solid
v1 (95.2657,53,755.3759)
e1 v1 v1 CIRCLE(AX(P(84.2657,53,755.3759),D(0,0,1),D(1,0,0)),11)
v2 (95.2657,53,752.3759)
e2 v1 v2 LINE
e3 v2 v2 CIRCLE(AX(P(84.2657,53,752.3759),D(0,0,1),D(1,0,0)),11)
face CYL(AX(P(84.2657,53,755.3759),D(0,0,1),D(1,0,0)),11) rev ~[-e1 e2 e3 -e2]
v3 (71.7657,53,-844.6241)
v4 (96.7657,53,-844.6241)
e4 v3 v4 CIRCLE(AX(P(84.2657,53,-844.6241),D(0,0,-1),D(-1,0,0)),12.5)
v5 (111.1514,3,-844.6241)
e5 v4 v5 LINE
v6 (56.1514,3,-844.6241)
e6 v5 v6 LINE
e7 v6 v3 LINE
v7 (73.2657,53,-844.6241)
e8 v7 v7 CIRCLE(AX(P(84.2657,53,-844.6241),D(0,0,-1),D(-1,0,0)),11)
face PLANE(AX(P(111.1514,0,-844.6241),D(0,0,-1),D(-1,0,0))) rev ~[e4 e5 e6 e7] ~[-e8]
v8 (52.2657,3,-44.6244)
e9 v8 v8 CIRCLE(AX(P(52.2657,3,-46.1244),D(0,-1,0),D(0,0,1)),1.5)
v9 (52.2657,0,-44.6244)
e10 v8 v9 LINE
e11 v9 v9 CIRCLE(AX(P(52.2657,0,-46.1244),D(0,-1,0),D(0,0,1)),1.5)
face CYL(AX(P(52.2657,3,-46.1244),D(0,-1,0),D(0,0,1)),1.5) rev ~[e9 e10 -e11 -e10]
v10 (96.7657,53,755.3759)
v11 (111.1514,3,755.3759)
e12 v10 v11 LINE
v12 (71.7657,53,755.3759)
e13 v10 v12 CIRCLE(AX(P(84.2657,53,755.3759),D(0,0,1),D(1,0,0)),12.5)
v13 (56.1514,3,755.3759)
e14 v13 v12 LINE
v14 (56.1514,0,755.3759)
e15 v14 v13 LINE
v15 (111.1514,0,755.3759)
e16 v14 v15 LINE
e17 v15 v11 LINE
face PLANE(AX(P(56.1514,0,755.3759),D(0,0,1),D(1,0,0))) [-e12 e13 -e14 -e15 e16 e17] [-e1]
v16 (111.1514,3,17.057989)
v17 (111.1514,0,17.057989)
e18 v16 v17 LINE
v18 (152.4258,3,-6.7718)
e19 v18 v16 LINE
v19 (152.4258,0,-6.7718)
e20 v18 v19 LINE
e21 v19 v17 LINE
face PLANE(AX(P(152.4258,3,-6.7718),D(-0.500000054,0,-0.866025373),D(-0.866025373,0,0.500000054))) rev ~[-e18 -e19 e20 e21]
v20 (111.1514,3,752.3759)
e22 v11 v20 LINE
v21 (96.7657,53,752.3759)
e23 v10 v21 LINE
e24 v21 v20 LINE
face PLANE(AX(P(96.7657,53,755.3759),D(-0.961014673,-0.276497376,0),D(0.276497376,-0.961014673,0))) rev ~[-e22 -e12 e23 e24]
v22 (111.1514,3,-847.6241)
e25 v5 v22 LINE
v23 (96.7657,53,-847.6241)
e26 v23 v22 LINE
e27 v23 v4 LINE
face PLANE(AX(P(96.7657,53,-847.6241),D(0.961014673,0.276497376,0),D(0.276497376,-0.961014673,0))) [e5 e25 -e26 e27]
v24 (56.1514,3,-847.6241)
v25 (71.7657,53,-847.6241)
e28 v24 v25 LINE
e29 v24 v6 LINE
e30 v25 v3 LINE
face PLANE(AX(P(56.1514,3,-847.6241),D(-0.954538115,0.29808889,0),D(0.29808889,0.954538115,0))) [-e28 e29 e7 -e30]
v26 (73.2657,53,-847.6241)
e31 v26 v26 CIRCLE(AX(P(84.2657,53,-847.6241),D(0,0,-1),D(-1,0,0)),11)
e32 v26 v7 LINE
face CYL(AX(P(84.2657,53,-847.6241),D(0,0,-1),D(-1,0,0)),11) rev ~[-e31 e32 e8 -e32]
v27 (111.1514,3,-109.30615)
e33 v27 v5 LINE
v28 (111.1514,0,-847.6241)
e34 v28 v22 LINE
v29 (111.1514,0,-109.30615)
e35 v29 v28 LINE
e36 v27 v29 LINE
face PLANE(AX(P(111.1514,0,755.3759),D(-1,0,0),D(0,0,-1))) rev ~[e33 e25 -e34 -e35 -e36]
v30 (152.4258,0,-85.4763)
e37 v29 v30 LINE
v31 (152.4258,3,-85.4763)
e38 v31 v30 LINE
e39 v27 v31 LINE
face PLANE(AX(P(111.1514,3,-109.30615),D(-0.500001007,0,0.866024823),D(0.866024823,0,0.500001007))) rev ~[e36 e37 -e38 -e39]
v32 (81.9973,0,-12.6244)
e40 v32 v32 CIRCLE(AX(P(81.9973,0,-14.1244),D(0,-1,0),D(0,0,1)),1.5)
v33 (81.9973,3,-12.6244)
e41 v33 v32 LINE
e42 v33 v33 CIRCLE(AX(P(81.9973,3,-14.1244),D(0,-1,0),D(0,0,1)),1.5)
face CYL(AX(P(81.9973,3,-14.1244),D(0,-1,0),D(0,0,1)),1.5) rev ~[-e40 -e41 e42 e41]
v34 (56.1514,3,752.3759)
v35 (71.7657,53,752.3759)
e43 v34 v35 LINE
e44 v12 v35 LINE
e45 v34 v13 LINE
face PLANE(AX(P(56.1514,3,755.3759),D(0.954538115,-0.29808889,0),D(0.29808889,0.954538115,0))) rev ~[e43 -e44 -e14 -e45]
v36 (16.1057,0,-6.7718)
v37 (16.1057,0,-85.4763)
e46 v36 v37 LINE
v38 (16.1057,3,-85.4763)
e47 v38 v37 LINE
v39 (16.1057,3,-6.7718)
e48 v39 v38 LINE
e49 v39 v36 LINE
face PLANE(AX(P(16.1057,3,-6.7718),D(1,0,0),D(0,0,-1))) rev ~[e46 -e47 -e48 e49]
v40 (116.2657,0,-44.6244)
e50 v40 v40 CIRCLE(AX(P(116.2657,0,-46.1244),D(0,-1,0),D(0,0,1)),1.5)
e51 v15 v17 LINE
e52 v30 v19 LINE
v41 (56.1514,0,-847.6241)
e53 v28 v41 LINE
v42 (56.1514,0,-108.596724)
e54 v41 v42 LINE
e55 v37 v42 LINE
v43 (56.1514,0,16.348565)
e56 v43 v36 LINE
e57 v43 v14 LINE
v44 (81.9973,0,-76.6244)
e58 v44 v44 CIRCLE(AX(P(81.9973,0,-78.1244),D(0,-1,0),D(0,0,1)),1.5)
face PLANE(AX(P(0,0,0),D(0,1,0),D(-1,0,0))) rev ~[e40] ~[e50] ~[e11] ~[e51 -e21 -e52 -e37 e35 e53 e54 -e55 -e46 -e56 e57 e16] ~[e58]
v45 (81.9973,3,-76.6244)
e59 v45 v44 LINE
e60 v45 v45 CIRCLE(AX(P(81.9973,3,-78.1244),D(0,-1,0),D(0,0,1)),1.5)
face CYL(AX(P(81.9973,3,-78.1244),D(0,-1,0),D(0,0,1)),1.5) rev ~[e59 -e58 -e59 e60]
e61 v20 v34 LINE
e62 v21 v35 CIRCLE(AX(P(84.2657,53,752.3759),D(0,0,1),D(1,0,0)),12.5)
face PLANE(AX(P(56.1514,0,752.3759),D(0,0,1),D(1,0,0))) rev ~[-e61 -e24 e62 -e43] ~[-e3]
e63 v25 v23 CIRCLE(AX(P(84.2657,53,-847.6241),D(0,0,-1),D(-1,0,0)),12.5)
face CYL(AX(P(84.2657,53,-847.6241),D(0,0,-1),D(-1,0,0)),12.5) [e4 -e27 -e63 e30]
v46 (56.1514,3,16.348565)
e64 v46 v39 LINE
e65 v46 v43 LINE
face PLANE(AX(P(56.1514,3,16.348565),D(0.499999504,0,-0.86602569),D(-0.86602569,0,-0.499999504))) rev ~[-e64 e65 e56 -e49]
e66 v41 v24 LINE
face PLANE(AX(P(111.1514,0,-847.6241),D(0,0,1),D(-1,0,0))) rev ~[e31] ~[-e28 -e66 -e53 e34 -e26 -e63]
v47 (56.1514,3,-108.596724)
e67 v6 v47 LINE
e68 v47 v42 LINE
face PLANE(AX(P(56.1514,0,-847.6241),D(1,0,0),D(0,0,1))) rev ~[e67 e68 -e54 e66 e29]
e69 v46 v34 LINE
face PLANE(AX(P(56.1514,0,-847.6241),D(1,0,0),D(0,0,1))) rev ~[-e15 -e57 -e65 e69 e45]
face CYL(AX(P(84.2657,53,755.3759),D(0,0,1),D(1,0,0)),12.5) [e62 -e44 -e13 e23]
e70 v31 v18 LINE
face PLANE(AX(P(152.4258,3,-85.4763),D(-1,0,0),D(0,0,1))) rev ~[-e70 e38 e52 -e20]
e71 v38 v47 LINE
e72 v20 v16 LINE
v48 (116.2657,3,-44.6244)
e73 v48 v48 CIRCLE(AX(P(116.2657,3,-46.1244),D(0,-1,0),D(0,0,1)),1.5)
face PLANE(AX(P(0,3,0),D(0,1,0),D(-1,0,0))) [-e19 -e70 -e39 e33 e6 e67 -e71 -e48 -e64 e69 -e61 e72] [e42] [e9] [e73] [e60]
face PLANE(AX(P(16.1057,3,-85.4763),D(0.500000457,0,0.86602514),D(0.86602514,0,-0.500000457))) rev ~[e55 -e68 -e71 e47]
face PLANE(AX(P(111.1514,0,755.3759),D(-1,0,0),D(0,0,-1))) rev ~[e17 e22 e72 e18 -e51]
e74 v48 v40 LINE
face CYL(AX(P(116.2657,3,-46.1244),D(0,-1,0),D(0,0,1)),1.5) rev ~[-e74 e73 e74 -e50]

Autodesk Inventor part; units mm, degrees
ref_plane "YZ Plane" through (0, 0, 0) normal (1, 0, 0) x (0, 1, 0)
ref_plane "XZ Plane" through (0, 0, 0) normal (0, 1, 0) x (-1, 0, 0)
ref_plane "XY Plane" through (0, 0, 0) normal (0, 0, 1) x (1, 0, 0)
sketch "Esboço1" plane through (0, 0, 0) normal (0, 1, 0) x (-1, 0, 0)
  line L0 (-56.1514, 755.3759) -> (-111.1514, 755.3759)
  line L1 (-111.1514, 755.3759) -> (-111.1514, -847.6241)
  line L2 (-111.1514, -847.6241) -> (-56.1514, -847.6241)
  line L3 (-56.1514, -847.6241) -> (-56.1514, 755.3759)
  point P0 (0, 0)
  dimension "d0" = 1603
  dimension "d1" = 55
extrude "Extrusão1" add sketch "Esboço1" along normal blind 3
sketch "Esboço2" plane through (56.1514, 0, 755.3759) normal (0, 0, 1) x (1, 0, 0)
  circle A0 centre (28.1143, 53) radius 12.5
  circle A1 centre (28.1143, 53) radius 11
  line L0 (55, 3) -> (0, 3) projected
  line L1 (0, 3) -> (15.6143, 53)
  line L2 (40.6143, 53) -> (55, 3)
  point P0 (-56.1514, 0)
  point P1 (17.1143, 53)
  point P2 (39.1143, 53)
  dimension "d4" = 25
  dimension "d5" = 22
  dimension "d8" = 50
extrude "Extrusão2" add sketch "Esboço2" against normal blind 3 contours L2 L0 L1 A0
sketch "Esboço4" plane through (111.1514, 0, -847.6241) normal (0, 0, -1) x (-1, 0, 0)
  arc A0 (39.3857, 53) -> (14.3857, 53) centre (26.8857, 53) ccw projected
  line L0 (0, 3) -> (55, 3)
  circle A1 centre (26.8857, 53) radius 11
  circle A2 centre (26.8857, 53) radius 12.5
  line L1 (14.3857, 53) -> (0, 3)
  line L2 (55, 3) -> (39.3857, 53)
  point P0 (111.1514, 0)
  dimension "d40" = 22
extrude "Extrusão3" add sketch "Esboço4" against normal blind 3
sketch "Esboço5" plane through (0, 3, 0) normal (0, 1, 0) x (1, 0, 0)
  line L0 (56.1514, -749.3759) -> (95.2658, -749.3759) projected
  line L1 (111.1514, 844.6241) -> (56.1514, 844.6241) projected
  line L2 (56.1514, 847.6241) -> (56.1514, -755.3759) projected
  circle A0 centre (-124.6549, -214.6876) radius 2
  circle A1 centre (-96.9649, -152.5807) radius 2
  line L3 (16.1057, 85.4763) -> (84.2658, 124.8286)
  line L4 (84.2658, 124.8286) -> (152.4258, 85.4763)
  line L5 (152.4258, 85.4763) -> (152.4258, 6.7718)
  line L6 (152.4258, 6.7718) -> (84.2658, -32.5804)
  line L7 (84.2658, -32.5804) -> (16.1057, 6.7718)
  line L8 (16.1057, 6.7718) -> (16.1057, 85.4763)
  line L9 (56.1514, 847.6241) -> (56.1514, -755.3759) projected
  line L10 (111.1514, -755.3759) -> (111.1514, 847.6241) projected
  line L11 (56.1514, -755.3759) -> (111.1514, -755.3759)
  line L12 (111.1514, -755.3759) -> (111.1514, 847.6241)
  line L13 (111.1514, 847.6241) -> (56.1514, 847.6241)
  line L14 (56.1514, 847.6241) -> (56.1514, -755.3759)
  line L15 (95.2658, -755.3759) -> (95.2658, -755.3759) projected
  line L16 (90.2658, 847.6241) -> (78.2658, 847.6241) projected
  line L17 (95.2658, -752.3759) -> (95.2658, -752.3759) projected
  point P0 (111.1514, 841.6241)
  point P1 (56.1514, 841.6241)
  point P2 (84.2658, 46.1241)
  point P3 (73.2658, -755.3759)
  point P4 (73.2658, -755.3759)
  point P5 (84.2658, -755.3759)
  point P6 (84.2658, 847.6241)
  point P7 (84.2658, 847.6241)
  point P8 (73.2658, -752.3759)
  point P9 (84.2658, -752.3759)
  point P10 (111.1514, 109.3061)
  point P11 (111.1514, -17.058)
  point P12 (56.1514, -16.3486)
  point P13 (56.1514, 108.5967)
  dimension "d13" = 4
  dimension "d14" = 4
  dimension "d15" = 68
  dimension "d20" = 722.7955
  dimension "d22" = 722.7955
  dimension "d25" = 0
extrude "Extrusão4" add sketch "Esboço5" against normal blind 3 contours L4 L5 L6 L10 | L2 L7 L8 L3
sketch "Esboço6" plane through (0, 3, 0) normal (0, 1, 0) x (1, 0, 0)
  circle A0 centre (116.2657, 46.1244) radius 1.5
  circle A1 centre (52.2657, 46.1244) radius 1.5
  line L0 (16.1057, 85.4763) -> (16.1057, 6.7718) projected
  line L1 (152.4258, 6.7718) -> (152.4258, 85.4763) projected
  circle A2 centre (81.9973, 14.1244) radius 1.5
  circle A3 centre (81.9973, 78.1244) radius 1.5
  point P0 (0, 0)
  point P1 (56.1514, -16.3486)
  point P2 (56.1514, 108.5967)
  dimension "d28" = 3
  dimension "d29" = 3
  dimension "d30" = 64
  dimension "d31" = 36.16
  dimension "d43" = 3
  dimension "d44" = 3
  dimension "d45" = 64
  dimension "d46" = 32
  dimension "d47" = 32
  dimension "d48" = 36.1602
  dimension "d49" = 62.473
hole "Furo1" at (52.2657, 3, -46.1244) at (116.2657, 3, -46.1244) at (81.9973, 3, -14.1244) at (81.9973, 3, -78.1244) direction (0, -1, 0) diameter 3 depth 20 tip angle 118
extrude "Extrusão5" add sketch "Esboço2" against normal blind 3 contours A0
properties part number "Suporte Central Atualizado"
